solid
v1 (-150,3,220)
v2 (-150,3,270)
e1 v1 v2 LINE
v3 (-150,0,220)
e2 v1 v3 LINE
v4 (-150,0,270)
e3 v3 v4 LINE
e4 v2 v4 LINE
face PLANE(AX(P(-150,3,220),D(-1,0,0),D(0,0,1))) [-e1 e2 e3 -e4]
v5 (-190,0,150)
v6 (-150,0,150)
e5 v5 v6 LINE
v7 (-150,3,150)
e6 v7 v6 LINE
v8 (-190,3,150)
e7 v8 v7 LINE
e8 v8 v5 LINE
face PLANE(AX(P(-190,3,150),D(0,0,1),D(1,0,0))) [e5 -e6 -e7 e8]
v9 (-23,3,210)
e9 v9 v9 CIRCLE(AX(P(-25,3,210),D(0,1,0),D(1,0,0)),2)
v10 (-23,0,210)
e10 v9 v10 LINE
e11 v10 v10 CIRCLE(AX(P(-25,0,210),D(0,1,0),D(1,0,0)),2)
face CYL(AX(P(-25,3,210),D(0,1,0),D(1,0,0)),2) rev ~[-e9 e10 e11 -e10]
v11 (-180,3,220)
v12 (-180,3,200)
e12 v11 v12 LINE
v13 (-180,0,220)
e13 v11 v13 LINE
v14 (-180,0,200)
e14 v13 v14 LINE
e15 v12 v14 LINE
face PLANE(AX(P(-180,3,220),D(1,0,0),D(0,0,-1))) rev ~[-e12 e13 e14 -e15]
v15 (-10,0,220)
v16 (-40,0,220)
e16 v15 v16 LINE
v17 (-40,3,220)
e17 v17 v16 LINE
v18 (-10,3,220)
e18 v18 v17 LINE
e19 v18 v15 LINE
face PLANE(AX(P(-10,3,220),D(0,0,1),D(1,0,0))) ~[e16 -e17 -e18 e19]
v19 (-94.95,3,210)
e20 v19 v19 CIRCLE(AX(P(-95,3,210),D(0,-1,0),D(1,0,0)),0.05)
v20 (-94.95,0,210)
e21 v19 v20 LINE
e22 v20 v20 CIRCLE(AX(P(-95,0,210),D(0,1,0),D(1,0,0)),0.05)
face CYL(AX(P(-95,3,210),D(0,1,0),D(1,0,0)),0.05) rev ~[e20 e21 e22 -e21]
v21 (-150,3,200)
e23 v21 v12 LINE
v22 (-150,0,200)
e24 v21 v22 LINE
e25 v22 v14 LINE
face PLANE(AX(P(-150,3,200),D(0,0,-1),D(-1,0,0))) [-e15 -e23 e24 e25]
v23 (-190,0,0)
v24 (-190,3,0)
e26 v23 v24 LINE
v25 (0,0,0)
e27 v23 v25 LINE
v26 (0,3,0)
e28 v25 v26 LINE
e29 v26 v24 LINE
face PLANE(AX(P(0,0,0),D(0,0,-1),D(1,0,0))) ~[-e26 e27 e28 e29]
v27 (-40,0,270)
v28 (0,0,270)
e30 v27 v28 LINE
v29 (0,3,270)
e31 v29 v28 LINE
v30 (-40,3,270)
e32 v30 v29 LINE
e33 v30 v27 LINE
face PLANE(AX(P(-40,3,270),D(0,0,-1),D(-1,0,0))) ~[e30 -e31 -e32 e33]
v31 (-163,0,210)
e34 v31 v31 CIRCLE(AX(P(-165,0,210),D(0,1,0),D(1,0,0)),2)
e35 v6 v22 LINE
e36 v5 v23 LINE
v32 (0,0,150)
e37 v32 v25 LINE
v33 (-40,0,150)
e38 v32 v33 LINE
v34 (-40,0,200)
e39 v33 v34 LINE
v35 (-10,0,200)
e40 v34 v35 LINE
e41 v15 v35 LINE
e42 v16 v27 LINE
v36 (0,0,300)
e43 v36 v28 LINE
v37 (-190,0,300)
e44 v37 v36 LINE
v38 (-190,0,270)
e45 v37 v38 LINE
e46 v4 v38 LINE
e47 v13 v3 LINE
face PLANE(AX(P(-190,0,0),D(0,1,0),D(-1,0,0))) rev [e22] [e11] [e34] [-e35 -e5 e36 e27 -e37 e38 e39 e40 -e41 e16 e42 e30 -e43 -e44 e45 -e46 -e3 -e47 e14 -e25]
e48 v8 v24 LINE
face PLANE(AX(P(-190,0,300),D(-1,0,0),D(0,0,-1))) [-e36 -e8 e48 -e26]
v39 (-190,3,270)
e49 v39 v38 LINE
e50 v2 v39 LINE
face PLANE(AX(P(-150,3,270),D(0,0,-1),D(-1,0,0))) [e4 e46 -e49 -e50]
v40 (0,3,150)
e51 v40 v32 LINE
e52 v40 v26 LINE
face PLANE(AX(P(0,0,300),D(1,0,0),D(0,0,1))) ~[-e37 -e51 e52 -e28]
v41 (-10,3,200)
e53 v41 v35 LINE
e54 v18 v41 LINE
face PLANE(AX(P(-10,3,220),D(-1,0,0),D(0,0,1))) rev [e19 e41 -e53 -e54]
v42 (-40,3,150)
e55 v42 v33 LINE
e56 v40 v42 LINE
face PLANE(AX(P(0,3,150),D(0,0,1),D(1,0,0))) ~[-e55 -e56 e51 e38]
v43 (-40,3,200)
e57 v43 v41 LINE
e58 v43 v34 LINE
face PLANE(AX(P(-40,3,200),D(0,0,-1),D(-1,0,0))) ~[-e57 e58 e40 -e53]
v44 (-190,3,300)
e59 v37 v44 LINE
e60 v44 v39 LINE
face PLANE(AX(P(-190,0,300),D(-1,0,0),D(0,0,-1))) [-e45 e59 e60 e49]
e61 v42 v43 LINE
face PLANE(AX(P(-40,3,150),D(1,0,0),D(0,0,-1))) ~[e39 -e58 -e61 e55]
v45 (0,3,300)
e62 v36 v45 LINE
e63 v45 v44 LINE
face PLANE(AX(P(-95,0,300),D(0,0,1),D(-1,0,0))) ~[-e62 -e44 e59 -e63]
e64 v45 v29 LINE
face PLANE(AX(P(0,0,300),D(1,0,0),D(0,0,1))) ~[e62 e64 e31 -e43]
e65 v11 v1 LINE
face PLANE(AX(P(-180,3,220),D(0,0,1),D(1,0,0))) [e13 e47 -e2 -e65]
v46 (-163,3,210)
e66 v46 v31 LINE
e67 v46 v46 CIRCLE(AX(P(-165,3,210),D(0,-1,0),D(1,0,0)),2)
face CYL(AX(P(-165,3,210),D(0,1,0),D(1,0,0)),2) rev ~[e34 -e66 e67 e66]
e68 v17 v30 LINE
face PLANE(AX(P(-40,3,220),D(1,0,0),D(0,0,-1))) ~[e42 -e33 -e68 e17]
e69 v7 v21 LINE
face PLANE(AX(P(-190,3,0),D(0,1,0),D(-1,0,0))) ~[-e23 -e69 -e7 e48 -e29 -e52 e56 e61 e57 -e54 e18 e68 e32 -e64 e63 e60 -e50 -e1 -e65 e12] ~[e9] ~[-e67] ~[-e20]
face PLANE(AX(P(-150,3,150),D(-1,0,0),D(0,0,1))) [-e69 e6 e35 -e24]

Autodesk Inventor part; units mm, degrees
ref_plane "YZ Plane" through (0, 0, 0) normal (1, 0, 0) x (0, 1, 0)
ref_plane "XZ Plane" through (0, 0, 0) normal (0, 1, 0) x (-1, 0, 0)
ref_plane "XY Plane" through (0, 0, 0) normal (0, 0, 1) x (1, 0, 0)
sketch "Sketch1" plane through (0, 0, 0) normal (0, 1, 0) x (-1, 0, 0)
  line L0 (0, 0) -> (0, 300)
  line L1 (0, 300) -> (190, 300)
  line L2 (190, 300) -> (190, 0)
  line L3 (190, 0) -> (0, 0)
  line L4 (0, 300) -> (95, 300)
  line L5 (0, 300) -> (95, 300) construction
  line L6 (95, 300) -> (95, -51.2612)
  point P0 (95, 0)
  dimension "d0" = 300
  dimension "d1" = 190
  dimension "d2" = 90
  dimension "d3" = 300
  dimension "d4" = 90
  dimension "d23" = 95
  dimension "d24" = 0
  dimension "d25" = 90
extrude "Extrusion1" add sketch "Sketch1" along normal blind 3 contours L6 L1 L2 L3
sketch "Sketch2" plane through (0, 3, 0) normal (0, 1, 0) x (1, 0, 0)
  line L0 (-190, 0) -> (-190, -300) projected
  line L1 (-190, -300) -> (-190, -210)
  line L2 (-190, -210) -> (-190, -200)
  line L3 (-190, -200) -> (-190, -150)
  line L4 (-190, -210) -> (-190, -220)
  line L5 (-190, -150) -> (-150, -150)
  line L6 (-150, -150) -> (-150, -200)
  line L7 (-150, -200) -> (-190, -200)
  line L8 (-190, -200) -> (-190, -150)
  line L9 (-190, -220) -> (-150, -220)
  line L10 (-150, -220) -> (-150, -270)
  line L11 (-150, -270) -> (-190, -270)
  line L12 (-190, -270) -> (-190, -220)
  line L13 (-190, -220) -> (-180, -220)
  line L14 (-180, -220) -> (-180, -200)
  point P0 (0, 0)
  point P1 (-190, -270)
  dimension "d7" = 90
  dimension "d8" = 10
  dimension "d9" = 50
  dimension "d10" = 10
  dimension "d11" = 40
  dimension "d12" = 50
  dimension "d13" = 40
  dimension "d14" = 50
  dimension "d15" = 10
extrude "Extrusion2" cut sketch "Sketch2" against normal blind 3
mirror "Mirror1" about plane through (-95, 0, 300) normal (1, 0, 0) of "Extrusion2", "Extrusion1"
sketch "Sketch4" plane through (0, 3, 0) normal (0, 1, 0) x (1, 0, 0)
  line L0 (-40, -200) -> (-10, -200) projected
  line L1 (-10, -200) -> (-10, -210)
  line L2 (-10, -200) -> (0, -200) construction
  line L3 (-10, -210) -> (-25, -210)
  line L4 (-180, -200) -> (-180, -210)
  line L5 (-180, -200) -> (-180, -220) projected
  line L6 (-180, -200) -> (-170, -200) construction
  line L7 (-180, -210) -> (-165, -210)
  circle A0 centre (-165, -210) radius 2
  circle A1 centre (-25, -210) radius 2
  point P0 (0, 0)
  dimension "d26" = 10
  dimension "d27" = 90
  dimension "d28" = 15
  dimension "d29" = 90
  dimension "d30" = 10
  dimension "d31" = 90
  dimension "d32" = 15
  dimension "d33" = 90
  dimension "d34" = 4
  dimension "d35" = 4
extrude "Extrusion4" cut sketch "Sketch4" against normal blind 10
sketch "Sketch5" plane through (0, 3, 0) normal (0, 1, 0) x (1, 0, 0)
  circle A0 centre (-165, -210) radius 2 projected
  line L0 (-165, -210) -> (-95, -210)
  circle A1 centre (-95, -210) radius 0.05
  point P0 (0, 0)
  dimension "d38" = 70
  dimension "d39" = 0.1
extrude "Extrusion5" cut sketch "Sketch5" against normal blind 10 contours A1
properties part number "onderplaat v2"
